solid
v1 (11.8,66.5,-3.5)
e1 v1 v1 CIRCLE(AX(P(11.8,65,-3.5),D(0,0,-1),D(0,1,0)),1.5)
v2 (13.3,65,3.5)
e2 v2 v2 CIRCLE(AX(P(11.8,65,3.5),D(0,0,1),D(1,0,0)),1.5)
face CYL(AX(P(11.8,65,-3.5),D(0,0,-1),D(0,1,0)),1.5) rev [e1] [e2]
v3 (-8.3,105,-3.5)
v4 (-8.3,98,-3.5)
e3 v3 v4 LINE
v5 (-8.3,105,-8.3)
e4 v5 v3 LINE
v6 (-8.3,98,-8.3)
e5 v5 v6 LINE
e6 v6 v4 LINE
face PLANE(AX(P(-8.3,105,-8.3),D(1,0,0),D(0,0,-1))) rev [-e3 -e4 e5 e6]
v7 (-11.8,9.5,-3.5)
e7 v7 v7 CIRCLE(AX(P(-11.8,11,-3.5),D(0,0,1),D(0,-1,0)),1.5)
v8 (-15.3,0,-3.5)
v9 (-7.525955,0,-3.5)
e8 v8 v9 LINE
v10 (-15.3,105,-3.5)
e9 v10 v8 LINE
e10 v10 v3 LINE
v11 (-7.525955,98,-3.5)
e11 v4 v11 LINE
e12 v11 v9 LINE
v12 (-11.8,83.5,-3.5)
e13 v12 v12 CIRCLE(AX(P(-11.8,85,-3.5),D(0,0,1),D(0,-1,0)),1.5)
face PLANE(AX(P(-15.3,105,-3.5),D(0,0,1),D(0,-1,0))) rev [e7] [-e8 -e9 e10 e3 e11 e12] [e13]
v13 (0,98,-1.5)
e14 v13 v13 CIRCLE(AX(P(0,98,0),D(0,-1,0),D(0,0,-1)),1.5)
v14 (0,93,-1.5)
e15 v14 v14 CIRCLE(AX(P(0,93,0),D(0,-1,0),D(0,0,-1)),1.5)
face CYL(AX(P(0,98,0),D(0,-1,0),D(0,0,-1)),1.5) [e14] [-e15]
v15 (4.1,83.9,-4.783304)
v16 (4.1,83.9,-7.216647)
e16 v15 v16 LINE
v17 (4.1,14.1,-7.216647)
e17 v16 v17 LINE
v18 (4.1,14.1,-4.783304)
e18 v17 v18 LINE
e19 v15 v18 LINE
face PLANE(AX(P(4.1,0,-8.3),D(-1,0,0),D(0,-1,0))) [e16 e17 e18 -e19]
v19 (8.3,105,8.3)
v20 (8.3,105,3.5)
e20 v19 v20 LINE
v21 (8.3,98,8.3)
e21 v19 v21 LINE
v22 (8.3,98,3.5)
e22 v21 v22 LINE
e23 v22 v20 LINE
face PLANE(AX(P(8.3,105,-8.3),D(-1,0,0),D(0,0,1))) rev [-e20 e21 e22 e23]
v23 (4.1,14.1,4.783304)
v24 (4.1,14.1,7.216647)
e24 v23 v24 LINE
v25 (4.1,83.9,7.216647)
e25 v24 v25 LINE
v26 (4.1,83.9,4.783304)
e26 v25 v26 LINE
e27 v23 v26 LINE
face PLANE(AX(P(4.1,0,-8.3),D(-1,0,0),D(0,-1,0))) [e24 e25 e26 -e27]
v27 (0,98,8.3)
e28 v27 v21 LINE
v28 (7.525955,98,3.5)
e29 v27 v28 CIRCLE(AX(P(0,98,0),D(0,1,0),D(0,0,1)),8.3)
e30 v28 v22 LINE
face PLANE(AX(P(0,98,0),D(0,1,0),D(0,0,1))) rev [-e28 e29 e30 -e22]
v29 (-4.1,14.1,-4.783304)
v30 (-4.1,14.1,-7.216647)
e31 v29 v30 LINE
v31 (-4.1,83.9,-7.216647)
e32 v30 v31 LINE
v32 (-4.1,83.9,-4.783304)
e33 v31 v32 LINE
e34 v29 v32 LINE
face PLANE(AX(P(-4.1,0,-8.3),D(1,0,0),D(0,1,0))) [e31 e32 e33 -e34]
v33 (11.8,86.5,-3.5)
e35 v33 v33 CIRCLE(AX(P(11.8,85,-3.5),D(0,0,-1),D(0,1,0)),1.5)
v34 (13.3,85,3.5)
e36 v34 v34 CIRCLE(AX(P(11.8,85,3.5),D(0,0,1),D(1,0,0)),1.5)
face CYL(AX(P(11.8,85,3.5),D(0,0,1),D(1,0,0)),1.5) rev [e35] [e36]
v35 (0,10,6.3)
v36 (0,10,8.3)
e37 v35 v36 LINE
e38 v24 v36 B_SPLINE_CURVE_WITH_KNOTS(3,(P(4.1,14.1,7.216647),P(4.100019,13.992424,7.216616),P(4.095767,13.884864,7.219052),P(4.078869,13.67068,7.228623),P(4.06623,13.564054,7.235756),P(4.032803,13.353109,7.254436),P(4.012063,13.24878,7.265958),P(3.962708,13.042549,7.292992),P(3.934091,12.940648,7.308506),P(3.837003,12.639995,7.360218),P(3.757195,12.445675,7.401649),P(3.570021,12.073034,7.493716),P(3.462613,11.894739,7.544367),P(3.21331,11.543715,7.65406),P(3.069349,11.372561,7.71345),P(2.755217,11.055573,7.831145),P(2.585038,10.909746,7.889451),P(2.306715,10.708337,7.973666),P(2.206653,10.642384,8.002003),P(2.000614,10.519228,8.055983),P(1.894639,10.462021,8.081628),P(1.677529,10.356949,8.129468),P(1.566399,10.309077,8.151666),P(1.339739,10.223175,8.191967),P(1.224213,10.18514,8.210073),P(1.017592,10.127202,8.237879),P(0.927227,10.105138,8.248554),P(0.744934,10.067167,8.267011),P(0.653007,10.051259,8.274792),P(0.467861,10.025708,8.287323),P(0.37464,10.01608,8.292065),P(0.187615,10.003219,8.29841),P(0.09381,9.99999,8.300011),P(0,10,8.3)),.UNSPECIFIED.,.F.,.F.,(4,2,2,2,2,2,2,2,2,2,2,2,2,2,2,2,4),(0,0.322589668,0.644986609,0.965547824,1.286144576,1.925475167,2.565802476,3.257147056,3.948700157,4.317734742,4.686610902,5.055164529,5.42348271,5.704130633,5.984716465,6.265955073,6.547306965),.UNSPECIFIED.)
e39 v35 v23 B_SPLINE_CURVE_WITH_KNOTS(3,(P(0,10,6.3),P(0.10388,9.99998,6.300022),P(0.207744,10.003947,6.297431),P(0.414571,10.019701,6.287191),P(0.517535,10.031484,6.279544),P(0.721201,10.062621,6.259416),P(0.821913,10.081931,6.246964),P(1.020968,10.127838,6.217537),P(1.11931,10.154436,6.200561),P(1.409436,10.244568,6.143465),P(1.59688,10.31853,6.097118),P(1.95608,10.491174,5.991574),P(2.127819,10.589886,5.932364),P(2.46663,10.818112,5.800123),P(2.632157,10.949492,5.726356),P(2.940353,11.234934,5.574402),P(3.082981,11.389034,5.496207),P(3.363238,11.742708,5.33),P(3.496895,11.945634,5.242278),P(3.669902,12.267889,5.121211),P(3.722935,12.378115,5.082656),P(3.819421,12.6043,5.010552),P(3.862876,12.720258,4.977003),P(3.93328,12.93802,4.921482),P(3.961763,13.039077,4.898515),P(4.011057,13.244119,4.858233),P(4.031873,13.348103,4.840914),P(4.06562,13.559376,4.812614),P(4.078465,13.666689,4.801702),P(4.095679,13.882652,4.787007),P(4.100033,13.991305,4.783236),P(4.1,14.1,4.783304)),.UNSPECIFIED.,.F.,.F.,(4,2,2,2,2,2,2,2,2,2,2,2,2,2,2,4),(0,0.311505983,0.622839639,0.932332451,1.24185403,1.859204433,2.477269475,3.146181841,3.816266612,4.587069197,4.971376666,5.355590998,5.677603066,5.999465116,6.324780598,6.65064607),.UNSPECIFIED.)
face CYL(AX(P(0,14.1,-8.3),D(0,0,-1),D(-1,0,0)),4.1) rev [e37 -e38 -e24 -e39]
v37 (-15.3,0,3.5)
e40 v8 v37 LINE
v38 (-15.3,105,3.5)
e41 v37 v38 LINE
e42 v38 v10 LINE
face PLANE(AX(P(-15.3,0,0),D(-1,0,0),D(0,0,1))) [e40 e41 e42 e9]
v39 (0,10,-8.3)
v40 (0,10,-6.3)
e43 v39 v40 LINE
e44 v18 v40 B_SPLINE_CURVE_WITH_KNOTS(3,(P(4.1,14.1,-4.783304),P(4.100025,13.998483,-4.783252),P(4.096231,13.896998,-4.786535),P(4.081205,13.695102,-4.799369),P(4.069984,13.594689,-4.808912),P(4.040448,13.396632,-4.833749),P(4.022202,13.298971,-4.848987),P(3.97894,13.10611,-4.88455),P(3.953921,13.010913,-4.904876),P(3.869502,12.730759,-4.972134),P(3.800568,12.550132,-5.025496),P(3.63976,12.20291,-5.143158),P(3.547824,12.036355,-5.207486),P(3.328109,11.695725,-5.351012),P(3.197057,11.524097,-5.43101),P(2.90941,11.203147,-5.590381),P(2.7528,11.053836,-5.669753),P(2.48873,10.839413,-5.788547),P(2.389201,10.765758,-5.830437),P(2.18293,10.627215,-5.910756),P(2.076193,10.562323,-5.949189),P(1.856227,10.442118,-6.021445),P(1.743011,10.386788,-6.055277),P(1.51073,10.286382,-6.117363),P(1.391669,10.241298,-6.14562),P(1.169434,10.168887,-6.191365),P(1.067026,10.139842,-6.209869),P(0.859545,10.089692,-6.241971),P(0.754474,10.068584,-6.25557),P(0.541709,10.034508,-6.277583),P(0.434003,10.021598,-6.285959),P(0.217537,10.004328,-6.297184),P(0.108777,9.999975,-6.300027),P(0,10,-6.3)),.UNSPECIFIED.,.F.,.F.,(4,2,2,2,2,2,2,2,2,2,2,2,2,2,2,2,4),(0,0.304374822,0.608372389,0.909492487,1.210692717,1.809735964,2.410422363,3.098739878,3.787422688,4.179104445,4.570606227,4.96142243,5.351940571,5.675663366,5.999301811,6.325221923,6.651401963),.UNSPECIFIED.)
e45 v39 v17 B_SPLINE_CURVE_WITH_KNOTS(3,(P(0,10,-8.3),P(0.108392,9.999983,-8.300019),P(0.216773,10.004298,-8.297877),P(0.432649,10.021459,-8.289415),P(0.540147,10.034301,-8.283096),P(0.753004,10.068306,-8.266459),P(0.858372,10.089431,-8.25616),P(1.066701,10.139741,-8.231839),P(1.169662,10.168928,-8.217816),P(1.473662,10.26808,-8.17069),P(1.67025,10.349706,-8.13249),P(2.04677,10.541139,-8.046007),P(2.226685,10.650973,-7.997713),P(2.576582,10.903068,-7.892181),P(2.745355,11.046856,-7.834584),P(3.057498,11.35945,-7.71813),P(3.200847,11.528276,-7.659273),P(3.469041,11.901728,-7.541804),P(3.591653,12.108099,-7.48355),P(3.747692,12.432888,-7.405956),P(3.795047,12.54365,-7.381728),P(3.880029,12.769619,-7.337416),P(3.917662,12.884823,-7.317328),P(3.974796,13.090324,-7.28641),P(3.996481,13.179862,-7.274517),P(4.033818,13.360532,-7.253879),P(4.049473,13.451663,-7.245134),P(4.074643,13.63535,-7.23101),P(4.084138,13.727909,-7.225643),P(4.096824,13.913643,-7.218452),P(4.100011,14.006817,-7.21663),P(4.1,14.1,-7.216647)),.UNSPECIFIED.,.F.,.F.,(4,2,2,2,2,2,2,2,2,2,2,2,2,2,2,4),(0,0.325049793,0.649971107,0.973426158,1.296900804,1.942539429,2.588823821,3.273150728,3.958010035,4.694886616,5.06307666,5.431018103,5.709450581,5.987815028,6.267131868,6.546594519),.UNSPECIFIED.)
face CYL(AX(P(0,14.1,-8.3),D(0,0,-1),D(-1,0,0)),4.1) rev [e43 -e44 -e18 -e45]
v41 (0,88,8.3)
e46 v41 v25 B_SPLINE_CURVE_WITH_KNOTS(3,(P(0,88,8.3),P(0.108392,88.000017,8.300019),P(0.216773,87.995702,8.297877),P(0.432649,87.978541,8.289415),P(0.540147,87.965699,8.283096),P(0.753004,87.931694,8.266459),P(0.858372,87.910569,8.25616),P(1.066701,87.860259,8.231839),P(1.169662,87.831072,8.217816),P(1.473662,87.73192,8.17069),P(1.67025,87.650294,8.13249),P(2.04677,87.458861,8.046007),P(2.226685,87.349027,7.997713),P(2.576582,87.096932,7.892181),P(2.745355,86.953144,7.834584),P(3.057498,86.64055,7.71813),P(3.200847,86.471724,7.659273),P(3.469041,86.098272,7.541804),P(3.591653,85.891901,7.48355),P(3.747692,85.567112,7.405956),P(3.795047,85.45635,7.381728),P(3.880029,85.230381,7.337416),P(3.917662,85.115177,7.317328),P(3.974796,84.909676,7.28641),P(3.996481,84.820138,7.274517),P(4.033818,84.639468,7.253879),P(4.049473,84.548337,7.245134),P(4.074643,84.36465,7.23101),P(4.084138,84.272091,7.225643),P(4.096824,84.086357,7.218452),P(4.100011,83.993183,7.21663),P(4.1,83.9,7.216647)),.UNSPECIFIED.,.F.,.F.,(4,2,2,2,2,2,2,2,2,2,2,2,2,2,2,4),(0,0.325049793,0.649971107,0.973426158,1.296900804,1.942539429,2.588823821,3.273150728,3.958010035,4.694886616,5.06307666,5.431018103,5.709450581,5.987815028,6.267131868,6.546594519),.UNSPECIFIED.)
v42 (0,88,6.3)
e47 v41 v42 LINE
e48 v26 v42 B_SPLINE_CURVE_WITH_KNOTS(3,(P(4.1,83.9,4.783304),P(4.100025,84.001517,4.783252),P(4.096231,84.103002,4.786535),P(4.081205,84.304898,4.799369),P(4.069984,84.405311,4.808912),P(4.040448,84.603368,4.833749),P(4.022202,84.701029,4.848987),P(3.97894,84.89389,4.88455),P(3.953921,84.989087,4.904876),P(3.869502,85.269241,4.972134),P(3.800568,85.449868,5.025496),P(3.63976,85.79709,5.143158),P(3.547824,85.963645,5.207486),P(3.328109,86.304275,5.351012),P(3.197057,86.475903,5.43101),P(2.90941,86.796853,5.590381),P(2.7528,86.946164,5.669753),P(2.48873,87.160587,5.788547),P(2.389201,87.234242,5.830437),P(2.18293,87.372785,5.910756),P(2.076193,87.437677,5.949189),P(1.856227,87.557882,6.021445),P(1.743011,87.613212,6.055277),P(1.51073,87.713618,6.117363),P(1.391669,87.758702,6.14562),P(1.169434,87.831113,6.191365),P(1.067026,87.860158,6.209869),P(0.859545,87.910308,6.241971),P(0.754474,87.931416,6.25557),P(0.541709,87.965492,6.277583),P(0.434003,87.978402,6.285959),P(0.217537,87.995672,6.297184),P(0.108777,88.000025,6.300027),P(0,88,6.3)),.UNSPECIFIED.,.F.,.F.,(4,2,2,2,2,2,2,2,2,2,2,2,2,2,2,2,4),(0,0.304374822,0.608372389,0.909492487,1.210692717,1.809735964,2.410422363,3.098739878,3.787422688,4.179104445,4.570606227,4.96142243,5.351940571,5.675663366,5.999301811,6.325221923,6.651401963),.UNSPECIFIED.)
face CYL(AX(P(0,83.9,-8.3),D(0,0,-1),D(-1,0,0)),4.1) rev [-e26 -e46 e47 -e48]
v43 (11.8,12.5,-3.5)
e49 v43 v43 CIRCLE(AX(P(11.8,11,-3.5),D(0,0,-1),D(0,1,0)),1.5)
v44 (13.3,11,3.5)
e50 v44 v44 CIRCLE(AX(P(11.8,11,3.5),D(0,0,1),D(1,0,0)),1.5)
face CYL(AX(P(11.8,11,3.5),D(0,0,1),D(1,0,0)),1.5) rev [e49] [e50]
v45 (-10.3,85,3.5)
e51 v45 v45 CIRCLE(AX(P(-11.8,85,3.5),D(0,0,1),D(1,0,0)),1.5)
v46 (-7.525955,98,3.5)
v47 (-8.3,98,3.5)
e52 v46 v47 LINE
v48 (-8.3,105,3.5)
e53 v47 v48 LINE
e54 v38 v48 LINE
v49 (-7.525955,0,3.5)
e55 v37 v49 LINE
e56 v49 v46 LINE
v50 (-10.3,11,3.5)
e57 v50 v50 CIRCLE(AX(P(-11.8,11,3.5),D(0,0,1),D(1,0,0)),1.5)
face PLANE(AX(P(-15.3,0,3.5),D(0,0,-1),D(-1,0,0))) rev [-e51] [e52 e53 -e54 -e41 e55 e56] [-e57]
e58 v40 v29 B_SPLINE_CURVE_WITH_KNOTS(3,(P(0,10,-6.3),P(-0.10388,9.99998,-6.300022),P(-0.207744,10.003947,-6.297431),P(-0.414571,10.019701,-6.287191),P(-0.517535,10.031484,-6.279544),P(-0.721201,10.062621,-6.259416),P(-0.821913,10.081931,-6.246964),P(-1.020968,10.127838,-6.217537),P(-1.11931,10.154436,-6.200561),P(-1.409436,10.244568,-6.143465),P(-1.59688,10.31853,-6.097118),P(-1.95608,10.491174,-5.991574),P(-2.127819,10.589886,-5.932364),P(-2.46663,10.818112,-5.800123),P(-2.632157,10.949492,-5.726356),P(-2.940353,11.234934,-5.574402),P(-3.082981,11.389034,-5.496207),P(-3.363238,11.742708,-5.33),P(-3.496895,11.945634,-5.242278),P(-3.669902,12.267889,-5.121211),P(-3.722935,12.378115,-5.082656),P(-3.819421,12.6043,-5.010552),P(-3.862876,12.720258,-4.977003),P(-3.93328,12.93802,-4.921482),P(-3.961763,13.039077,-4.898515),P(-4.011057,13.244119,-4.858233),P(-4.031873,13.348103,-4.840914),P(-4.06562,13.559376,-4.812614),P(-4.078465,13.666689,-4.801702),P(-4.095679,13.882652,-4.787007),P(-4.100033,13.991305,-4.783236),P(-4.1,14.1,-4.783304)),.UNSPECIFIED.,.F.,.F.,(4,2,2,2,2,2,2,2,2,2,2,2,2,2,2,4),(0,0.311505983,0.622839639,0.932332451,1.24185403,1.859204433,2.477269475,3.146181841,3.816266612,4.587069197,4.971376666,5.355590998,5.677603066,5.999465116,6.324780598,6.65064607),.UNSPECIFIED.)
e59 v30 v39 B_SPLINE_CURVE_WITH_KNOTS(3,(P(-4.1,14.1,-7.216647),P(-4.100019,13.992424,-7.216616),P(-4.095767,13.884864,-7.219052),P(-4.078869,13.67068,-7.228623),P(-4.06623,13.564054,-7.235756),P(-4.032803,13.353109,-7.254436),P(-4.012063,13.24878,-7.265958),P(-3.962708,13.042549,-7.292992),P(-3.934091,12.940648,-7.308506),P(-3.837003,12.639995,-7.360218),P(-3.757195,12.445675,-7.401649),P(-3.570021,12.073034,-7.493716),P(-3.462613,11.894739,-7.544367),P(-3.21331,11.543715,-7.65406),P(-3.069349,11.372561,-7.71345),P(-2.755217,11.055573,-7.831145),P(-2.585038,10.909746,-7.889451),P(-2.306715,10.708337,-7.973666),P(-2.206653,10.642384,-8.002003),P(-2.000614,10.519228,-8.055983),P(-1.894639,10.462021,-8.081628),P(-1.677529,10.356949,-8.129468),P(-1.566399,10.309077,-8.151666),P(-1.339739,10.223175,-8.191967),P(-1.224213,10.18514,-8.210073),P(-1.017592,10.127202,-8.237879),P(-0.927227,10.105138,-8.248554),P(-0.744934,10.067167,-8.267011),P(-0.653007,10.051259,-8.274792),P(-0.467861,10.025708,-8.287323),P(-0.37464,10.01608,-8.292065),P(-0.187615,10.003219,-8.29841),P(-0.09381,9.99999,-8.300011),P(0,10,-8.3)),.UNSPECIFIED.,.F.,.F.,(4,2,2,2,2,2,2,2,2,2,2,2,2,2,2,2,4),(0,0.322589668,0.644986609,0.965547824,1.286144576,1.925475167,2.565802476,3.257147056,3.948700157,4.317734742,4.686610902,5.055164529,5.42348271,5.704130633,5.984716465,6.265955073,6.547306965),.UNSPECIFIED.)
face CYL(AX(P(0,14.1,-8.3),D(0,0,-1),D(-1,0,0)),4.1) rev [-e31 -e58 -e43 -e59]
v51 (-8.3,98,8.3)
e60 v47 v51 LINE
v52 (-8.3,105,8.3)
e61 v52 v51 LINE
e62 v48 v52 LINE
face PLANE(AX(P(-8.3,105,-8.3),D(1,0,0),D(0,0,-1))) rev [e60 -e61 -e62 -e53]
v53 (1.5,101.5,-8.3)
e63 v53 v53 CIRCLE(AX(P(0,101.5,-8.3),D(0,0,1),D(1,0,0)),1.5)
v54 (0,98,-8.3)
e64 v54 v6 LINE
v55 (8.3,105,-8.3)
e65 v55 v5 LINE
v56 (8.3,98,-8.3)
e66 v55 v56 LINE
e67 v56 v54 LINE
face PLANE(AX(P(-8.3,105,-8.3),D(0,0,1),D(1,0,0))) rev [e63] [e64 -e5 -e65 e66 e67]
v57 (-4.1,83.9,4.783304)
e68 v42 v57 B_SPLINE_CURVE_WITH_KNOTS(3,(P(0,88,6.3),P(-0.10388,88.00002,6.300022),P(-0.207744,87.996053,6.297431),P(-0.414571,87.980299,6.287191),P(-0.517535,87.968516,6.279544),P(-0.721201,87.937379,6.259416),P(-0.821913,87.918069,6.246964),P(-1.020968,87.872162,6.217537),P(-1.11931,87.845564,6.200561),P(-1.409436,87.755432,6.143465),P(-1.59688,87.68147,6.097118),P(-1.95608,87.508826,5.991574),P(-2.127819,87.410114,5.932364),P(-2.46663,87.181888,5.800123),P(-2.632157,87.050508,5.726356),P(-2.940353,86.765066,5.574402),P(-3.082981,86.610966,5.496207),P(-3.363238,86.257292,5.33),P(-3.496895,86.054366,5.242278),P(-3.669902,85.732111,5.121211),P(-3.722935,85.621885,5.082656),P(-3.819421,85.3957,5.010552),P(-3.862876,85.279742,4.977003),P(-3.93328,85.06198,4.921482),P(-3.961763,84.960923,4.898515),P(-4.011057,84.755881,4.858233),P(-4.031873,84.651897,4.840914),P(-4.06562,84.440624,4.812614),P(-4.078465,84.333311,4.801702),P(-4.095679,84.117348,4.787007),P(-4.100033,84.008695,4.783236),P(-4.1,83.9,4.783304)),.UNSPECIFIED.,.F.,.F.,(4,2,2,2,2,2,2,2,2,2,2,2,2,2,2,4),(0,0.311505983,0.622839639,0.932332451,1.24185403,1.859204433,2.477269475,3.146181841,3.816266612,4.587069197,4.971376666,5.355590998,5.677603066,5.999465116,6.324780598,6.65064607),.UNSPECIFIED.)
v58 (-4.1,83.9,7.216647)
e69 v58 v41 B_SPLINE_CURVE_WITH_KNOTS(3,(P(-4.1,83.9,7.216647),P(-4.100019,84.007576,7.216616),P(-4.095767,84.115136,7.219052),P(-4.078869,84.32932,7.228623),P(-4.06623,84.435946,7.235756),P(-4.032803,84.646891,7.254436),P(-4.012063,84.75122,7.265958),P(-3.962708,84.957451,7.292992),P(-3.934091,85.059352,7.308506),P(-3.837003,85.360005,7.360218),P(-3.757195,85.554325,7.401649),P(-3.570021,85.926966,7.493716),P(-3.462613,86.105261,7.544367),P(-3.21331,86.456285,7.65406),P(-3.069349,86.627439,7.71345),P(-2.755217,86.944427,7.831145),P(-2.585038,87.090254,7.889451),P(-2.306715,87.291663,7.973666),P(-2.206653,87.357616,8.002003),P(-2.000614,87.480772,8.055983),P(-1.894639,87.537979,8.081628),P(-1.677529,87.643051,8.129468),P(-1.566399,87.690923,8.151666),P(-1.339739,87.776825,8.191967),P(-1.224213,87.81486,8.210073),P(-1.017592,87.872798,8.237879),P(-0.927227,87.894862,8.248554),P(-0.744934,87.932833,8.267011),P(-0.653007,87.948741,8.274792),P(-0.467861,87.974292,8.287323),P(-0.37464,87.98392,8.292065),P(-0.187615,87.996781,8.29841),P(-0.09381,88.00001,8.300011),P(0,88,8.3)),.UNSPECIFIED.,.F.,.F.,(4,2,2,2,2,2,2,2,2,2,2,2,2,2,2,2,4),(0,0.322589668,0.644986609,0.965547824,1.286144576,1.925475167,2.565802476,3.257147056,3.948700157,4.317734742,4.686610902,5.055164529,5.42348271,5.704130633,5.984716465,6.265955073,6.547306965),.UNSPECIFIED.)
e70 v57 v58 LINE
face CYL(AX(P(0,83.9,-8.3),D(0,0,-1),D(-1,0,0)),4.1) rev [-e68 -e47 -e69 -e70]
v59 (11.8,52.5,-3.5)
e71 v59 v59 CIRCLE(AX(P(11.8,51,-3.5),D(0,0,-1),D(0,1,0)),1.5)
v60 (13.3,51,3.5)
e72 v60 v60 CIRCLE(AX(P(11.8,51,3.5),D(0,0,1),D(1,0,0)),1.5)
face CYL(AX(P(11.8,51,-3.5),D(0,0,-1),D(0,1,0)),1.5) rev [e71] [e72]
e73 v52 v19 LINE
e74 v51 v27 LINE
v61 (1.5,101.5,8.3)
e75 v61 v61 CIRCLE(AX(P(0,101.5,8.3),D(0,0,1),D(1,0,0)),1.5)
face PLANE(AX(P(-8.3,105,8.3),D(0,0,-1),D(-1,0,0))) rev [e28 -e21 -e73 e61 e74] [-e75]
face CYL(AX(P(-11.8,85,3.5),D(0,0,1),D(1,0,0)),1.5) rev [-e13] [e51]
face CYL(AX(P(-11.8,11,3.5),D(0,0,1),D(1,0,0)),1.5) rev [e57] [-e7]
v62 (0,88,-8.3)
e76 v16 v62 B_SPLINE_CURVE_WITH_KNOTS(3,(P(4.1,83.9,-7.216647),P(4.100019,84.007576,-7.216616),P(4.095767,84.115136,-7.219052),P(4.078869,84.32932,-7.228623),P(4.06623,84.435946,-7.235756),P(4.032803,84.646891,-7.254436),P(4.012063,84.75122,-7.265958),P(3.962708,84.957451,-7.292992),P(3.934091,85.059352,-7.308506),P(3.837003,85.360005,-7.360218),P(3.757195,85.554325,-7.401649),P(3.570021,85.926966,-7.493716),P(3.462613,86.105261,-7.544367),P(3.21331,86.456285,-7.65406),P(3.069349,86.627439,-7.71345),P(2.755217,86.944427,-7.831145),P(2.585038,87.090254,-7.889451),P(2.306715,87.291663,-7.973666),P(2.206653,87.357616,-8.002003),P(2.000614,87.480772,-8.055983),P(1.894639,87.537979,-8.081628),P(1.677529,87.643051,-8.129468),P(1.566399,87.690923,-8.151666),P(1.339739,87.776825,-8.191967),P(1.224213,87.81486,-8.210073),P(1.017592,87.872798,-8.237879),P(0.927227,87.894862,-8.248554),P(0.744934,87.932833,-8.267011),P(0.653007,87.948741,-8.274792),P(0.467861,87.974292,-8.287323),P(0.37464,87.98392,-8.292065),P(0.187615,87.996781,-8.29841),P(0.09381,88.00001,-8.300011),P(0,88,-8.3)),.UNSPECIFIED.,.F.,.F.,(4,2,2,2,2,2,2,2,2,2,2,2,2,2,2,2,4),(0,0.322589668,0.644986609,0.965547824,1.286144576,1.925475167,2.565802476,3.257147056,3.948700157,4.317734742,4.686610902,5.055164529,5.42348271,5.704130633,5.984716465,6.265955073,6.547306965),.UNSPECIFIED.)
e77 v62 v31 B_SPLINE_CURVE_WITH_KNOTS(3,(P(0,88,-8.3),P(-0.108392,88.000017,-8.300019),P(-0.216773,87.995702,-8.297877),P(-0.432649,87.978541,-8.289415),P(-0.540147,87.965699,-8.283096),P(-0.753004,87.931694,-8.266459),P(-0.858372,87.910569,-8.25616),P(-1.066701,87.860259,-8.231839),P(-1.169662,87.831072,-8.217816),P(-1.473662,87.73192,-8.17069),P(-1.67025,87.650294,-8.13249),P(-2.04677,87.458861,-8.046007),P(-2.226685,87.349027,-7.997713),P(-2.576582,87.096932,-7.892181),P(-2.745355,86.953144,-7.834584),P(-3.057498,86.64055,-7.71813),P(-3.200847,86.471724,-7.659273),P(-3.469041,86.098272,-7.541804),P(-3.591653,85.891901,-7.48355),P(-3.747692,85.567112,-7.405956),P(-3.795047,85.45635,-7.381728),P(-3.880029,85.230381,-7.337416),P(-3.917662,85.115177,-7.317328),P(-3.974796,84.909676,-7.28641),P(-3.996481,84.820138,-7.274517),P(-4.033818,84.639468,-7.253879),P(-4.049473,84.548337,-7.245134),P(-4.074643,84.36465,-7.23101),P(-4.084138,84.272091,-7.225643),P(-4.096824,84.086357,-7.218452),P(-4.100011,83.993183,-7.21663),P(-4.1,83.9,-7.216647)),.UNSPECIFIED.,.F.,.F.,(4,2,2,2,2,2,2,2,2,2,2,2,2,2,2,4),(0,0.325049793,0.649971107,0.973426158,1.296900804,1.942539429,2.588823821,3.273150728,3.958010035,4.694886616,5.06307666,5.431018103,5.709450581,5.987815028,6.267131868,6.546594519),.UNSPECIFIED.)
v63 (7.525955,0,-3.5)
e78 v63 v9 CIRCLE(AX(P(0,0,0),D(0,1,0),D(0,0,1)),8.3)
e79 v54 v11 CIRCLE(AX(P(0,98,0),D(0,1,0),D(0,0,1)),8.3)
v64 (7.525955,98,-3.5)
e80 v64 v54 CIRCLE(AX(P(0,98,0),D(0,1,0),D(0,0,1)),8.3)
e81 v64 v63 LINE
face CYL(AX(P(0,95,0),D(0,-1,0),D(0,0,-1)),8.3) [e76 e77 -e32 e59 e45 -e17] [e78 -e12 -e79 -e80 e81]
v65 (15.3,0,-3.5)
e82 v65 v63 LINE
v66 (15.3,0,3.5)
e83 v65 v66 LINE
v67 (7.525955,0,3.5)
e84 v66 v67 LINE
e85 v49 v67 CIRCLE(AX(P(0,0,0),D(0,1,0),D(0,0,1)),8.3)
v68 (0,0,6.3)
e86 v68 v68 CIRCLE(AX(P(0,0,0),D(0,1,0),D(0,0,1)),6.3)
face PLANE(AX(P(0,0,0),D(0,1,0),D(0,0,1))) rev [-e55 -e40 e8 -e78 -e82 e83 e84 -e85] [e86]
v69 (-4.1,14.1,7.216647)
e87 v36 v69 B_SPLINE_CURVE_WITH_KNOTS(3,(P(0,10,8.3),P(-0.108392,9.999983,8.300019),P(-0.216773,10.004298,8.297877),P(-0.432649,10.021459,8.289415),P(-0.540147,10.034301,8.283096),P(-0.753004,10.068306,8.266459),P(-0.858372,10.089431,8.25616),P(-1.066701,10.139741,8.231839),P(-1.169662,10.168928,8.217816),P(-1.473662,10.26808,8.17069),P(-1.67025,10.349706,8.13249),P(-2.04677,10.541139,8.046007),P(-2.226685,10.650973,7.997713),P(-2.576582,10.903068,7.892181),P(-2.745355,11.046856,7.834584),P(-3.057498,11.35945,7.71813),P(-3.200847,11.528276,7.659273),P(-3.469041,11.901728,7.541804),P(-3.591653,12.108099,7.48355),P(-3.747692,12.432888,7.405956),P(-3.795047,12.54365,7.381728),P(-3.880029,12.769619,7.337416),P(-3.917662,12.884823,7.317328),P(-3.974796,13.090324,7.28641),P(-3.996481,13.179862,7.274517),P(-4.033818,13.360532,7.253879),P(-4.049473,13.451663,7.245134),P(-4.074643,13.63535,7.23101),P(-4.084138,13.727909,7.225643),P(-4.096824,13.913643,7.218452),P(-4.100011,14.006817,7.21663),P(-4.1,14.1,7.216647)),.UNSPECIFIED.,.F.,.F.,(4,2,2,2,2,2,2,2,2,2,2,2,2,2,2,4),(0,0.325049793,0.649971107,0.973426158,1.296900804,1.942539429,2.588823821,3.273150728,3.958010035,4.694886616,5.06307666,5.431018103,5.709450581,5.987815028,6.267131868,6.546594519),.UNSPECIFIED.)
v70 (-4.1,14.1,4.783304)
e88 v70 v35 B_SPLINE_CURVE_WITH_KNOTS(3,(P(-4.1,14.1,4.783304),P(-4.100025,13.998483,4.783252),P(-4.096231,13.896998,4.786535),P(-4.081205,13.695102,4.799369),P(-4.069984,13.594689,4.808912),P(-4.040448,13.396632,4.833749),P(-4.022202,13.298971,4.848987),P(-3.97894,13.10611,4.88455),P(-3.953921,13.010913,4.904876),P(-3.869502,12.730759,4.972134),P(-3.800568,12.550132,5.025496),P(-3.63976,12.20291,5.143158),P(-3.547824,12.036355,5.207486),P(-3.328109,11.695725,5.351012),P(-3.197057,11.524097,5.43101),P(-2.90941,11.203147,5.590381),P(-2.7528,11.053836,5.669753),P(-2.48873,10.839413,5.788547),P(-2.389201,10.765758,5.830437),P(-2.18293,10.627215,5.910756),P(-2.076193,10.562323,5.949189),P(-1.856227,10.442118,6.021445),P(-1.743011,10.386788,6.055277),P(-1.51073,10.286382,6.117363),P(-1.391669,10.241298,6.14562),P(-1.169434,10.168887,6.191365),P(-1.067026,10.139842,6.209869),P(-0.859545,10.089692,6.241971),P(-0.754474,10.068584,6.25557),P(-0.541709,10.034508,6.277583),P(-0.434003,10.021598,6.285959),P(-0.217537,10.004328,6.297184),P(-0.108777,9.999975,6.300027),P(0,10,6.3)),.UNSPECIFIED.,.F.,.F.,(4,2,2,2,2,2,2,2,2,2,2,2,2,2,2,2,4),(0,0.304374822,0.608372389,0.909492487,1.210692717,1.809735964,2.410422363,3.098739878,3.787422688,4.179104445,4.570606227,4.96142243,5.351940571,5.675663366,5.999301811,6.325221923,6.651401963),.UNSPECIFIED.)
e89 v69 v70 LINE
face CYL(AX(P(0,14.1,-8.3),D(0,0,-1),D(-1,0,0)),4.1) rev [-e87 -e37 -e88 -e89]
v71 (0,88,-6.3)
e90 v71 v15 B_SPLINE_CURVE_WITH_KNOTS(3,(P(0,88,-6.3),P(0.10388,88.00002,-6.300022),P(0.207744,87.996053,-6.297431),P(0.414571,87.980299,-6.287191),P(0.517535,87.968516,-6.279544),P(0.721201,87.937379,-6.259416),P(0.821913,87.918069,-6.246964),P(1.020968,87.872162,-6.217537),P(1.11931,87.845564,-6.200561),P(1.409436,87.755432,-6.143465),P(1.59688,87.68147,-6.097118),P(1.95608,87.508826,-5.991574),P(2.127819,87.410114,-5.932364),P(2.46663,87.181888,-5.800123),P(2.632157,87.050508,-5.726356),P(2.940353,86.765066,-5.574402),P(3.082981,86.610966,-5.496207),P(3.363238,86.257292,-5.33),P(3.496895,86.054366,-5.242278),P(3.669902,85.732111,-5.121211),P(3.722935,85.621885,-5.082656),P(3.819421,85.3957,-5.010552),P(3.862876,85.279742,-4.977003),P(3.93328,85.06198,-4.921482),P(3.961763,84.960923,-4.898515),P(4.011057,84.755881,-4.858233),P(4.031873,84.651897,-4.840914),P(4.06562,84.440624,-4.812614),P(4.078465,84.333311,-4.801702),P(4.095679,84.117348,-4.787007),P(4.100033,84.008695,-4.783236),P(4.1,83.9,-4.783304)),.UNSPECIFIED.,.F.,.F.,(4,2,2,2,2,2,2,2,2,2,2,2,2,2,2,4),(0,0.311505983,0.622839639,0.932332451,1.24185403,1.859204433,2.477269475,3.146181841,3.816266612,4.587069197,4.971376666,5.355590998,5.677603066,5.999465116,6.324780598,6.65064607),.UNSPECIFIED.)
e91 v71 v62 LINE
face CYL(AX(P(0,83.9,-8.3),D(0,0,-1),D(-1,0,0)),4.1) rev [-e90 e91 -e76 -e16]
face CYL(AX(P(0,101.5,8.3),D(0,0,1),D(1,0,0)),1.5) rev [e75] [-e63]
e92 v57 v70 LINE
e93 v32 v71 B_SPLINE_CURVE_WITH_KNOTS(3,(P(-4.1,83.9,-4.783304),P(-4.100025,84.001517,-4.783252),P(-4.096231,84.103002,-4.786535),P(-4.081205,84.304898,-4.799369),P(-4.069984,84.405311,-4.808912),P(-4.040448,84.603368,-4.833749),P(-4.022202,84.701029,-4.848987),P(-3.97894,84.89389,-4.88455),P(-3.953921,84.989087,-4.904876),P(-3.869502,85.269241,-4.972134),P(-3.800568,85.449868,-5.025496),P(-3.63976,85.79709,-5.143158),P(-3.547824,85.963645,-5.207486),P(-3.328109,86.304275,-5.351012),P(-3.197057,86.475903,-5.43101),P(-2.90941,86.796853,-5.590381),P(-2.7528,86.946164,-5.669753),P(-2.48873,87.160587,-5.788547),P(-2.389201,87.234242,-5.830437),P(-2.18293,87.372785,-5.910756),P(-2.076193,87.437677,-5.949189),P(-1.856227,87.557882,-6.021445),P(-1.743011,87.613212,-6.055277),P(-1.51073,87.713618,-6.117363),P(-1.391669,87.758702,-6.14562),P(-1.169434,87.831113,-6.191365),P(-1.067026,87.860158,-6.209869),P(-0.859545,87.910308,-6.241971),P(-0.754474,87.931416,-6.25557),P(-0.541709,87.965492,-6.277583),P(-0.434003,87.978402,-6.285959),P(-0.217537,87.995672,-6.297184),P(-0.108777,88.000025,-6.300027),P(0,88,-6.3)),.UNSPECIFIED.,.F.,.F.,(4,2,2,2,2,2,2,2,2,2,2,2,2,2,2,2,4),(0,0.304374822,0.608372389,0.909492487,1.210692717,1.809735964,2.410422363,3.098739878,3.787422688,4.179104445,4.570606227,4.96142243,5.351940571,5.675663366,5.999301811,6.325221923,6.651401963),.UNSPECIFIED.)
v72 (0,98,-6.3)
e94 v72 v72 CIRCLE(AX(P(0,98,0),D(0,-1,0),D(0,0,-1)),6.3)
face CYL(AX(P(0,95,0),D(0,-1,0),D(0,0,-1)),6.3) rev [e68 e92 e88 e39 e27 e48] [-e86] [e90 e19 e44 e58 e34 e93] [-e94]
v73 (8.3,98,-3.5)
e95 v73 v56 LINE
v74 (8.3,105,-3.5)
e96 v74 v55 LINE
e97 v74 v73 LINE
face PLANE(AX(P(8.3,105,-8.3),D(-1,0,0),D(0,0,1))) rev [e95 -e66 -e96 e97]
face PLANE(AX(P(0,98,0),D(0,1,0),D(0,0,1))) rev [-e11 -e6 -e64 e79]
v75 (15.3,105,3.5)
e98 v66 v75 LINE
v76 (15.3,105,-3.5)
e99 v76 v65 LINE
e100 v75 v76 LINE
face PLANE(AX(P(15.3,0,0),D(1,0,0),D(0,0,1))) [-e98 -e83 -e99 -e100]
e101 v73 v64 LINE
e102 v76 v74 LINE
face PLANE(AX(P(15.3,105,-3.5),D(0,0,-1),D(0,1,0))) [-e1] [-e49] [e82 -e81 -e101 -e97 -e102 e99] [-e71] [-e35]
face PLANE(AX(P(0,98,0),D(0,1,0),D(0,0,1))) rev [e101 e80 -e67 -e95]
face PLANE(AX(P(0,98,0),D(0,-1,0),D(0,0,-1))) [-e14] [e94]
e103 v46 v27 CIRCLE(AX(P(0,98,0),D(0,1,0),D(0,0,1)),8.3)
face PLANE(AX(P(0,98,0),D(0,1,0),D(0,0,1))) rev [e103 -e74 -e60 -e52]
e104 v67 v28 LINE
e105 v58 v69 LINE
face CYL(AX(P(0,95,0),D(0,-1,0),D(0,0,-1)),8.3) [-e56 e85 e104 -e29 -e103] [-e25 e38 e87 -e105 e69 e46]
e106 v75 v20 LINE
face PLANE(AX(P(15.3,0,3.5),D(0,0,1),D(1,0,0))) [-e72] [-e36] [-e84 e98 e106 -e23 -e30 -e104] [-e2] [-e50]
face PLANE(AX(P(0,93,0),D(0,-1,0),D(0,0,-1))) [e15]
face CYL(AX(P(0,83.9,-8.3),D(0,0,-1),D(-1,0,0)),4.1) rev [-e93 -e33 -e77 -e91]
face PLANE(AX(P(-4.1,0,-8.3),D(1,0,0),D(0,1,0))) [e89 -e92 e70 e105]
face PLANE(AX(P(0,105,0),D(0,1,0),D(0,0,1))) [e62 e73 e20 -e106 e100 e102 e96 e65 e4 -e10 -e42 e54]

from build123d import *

# Parameters (mm, degrees)
SKETCH1_R                = 8.3
SKETCH1_R_2              = 6.3
BOSS_EXTRUDE1_DEPTH      = 95
SKETCH3_R                = 8.3
BOSS_EXTRUDE2_DEPTH      = 3
SKETCH5_W                = 16.6
SKETCH5_H                = 16.6
BOSS_EXTRUDE4_DEPTH      = 7
CUT_EXTRUDE1_DEPTH       = 107.627623063
FILLET1_R                = 4.1
SKETCH4_R                = 6.3
SKETCH4_R_2              = 1.5
CUT_EXTRUDE3_DEPTH       = 3
BOSS_EXTRUDE6_START      = 2
SKETCH8_R                = 1.5
BOSS_EXTRUDE6_DEPTH      = 2
BOSS_EXTRUDE7_START      = -0.774045
BOSS_EXTRUDE7_DEPTH      = 7.774045
F_3_0_3_DIAMETER_HOLE1_D = 3
F_3_0_3_DIAMETER_HOLE2_D = 3
F_3_0_3_DIAMETER_HOLE3_D = 3


with BuildPart() as part:
    # Sketch1 → Boss-Extrude1 (new body)
    with BuildSketch(Plane(origin=(0, 0, 0), x_dir=(1, 0, 0), z_dir=(0, 1, 0))):
        with Locations(Location((0, 0, 0), (0, 0, 270))):
            Circle(SKETCH1_R)
        with Locations(Location((0, 0, 0), (0, 0, 270))):
            Circle(SKETCH1_R_2, mode=Mode.SUBTRACT)
    extrude(amount=BOSS_EXTRUDE1_DEPTH)

    # Sketch3 → Boss-Extrude2 (add)
    with BuildSketch(Plane(origin=(0, 95, 0), x_dir=(1, 0, 0), z_dir=(0, 1, 0))):
        with Locations(Location((0, 0, 0), (0, 0, 270))):
            Circle(SKETCH3_R)
    extrude(amount=BOSS_EXTRUDE2_DEPTH)

    # Sketch5 → Boss-Extrude4 (add)
    with BuildSketch(Plane(origin=(0, 98, 0), x_dir=(1, 0, 0), z_dir=(0, 1, 0))):
        Rectangle(SKETCH5_W, SKETCH5_H)
    extrude(amount=BOSS_EXTRUDE4_DEPTH)

    # Sketch6 → Cut-Extrude1 (cut, through all)
    with BuildSketch(Plane.XY.offset(8.3)):
        Polygon((4.1, 10), (0, 10), (-4.1, 10), (-4.1, 88), (4.1, 88), align=None)
    extrude(amount=-CUT_EXTRUDE1_DEPTH, mode=Mode.SUBTRACT)

    # Fillet1
    fillet1_edges = [part.edges().sort_by_distance(p)[0] for p in [
        (4.1, 88, 5.999975859),
        (4.1, 88, -5.999975859),
        (-4.1, 88, 5.999975859),
        (-4.1, 88, -5.999975859),
        (4.1, 10, -5.999975859),
        (4.1, 10, 5.999975859),
        (-4.1, 10, -5.999975859),
        (-4.1, 10, 5.999975859),
    ]]
    fillet(fillet1_edges, radius=FILLET1_R - 0.0001)  # a hair under: the kernel refuses the full size

    # Sketch4 → Cut-Extrude3 (cut)
    with BuildSketch(Plane(origin=(0, 95, 0), x_dir=(-1, 0, 0), z_dir=(0, -1, 0))):
        with Locations(Location((0, 0, 0), (0, 0, 90))):
            Circle(SKETCH4_R)
        with Locations(Location((0, 0, 0), (0, 0, 90))):
            Circle(SKETCH4_R_2, mode=Mode.SUBTRACT)
    extrude(amount=-CUT_EXTRUDE3_DEPTH, mode=Mode.SUBTRACT)

    # Sketch8 → Boss-Extrude6 (add)
    with BuildSketch(Plane(origin=(0, 95, 0), x_dir=(-1, 0, 0), z_dir=(0, -1, 0)).offset(BOSS_EXTRUDE6_START)):
        with Locations(Location((0, 0, 0), (0, 0, 90))):
            Circle(SKETCH8_R)
    extrude(amount=-BOSS_EXTRUDE6_DEPTH)

    # Sketch9 → Boss-Extrude7 (add)
    with BuildSketch(Plane.ZY.offset(8.3).offset(BOSS_EXTRUDE7_START)):
        Polygon((0, 0), (3.5, 0), (3.5, 105), (-3.5, 105), (-3.5, 0), align=None)
    boss_extrude7 = extrude(amount=BOSS_EXTRUDE7_DEPTH)

    # Mirror1: Boss-Extrude7 across plane
    add(boss_extrude7.mirror(Plane(origin=(0, 0, 0), x_dir=(0, 0, 1), z_dir=(1, 0, 0))))

    # Ø3.0 (3) Diameter Hole1 (through all)
    with Locations(Plane.XY.offset(8.3)):
        with Locations((0, 101.5)):
            Hole(F_3_0_3_DIAMETER_HOLE1_D / 2)

    # Ø3.0 (3) Diameter Hole2 (through all)
    with Locations(Plane.XY.offset(3.5)):
        with Locations((11.8, 85), (11.8, 11)):
            f_3_0_3_diameter_hole2 = Hole(F_3_0_3_DIAMETER_HOLE2_D / 2)

    # Ø3.0 (3) Diameter Hole3 (through all)
    with Locations(Plane(origin=(0, 0, -3.5), x_dir=(-1, 0, 0), z_dir=(0, 0, -1))):
        with Locations((-11.8, 65), (-11.8, 51)):
            Hole(F_3_0_3_DIAMETER_HOLE3_D / 2)

    # Mirror2: Ø3.0 (3) Diameter Hole2 across plane
    add(f_3_0_3_diameter_hole2.mirror(Plane(origin=(0, 0, 0), x_dir=(0, 0, 1), z_dir=(1, 0, 0))), mode=Mode.SUBTRACT)


solid = part.part
